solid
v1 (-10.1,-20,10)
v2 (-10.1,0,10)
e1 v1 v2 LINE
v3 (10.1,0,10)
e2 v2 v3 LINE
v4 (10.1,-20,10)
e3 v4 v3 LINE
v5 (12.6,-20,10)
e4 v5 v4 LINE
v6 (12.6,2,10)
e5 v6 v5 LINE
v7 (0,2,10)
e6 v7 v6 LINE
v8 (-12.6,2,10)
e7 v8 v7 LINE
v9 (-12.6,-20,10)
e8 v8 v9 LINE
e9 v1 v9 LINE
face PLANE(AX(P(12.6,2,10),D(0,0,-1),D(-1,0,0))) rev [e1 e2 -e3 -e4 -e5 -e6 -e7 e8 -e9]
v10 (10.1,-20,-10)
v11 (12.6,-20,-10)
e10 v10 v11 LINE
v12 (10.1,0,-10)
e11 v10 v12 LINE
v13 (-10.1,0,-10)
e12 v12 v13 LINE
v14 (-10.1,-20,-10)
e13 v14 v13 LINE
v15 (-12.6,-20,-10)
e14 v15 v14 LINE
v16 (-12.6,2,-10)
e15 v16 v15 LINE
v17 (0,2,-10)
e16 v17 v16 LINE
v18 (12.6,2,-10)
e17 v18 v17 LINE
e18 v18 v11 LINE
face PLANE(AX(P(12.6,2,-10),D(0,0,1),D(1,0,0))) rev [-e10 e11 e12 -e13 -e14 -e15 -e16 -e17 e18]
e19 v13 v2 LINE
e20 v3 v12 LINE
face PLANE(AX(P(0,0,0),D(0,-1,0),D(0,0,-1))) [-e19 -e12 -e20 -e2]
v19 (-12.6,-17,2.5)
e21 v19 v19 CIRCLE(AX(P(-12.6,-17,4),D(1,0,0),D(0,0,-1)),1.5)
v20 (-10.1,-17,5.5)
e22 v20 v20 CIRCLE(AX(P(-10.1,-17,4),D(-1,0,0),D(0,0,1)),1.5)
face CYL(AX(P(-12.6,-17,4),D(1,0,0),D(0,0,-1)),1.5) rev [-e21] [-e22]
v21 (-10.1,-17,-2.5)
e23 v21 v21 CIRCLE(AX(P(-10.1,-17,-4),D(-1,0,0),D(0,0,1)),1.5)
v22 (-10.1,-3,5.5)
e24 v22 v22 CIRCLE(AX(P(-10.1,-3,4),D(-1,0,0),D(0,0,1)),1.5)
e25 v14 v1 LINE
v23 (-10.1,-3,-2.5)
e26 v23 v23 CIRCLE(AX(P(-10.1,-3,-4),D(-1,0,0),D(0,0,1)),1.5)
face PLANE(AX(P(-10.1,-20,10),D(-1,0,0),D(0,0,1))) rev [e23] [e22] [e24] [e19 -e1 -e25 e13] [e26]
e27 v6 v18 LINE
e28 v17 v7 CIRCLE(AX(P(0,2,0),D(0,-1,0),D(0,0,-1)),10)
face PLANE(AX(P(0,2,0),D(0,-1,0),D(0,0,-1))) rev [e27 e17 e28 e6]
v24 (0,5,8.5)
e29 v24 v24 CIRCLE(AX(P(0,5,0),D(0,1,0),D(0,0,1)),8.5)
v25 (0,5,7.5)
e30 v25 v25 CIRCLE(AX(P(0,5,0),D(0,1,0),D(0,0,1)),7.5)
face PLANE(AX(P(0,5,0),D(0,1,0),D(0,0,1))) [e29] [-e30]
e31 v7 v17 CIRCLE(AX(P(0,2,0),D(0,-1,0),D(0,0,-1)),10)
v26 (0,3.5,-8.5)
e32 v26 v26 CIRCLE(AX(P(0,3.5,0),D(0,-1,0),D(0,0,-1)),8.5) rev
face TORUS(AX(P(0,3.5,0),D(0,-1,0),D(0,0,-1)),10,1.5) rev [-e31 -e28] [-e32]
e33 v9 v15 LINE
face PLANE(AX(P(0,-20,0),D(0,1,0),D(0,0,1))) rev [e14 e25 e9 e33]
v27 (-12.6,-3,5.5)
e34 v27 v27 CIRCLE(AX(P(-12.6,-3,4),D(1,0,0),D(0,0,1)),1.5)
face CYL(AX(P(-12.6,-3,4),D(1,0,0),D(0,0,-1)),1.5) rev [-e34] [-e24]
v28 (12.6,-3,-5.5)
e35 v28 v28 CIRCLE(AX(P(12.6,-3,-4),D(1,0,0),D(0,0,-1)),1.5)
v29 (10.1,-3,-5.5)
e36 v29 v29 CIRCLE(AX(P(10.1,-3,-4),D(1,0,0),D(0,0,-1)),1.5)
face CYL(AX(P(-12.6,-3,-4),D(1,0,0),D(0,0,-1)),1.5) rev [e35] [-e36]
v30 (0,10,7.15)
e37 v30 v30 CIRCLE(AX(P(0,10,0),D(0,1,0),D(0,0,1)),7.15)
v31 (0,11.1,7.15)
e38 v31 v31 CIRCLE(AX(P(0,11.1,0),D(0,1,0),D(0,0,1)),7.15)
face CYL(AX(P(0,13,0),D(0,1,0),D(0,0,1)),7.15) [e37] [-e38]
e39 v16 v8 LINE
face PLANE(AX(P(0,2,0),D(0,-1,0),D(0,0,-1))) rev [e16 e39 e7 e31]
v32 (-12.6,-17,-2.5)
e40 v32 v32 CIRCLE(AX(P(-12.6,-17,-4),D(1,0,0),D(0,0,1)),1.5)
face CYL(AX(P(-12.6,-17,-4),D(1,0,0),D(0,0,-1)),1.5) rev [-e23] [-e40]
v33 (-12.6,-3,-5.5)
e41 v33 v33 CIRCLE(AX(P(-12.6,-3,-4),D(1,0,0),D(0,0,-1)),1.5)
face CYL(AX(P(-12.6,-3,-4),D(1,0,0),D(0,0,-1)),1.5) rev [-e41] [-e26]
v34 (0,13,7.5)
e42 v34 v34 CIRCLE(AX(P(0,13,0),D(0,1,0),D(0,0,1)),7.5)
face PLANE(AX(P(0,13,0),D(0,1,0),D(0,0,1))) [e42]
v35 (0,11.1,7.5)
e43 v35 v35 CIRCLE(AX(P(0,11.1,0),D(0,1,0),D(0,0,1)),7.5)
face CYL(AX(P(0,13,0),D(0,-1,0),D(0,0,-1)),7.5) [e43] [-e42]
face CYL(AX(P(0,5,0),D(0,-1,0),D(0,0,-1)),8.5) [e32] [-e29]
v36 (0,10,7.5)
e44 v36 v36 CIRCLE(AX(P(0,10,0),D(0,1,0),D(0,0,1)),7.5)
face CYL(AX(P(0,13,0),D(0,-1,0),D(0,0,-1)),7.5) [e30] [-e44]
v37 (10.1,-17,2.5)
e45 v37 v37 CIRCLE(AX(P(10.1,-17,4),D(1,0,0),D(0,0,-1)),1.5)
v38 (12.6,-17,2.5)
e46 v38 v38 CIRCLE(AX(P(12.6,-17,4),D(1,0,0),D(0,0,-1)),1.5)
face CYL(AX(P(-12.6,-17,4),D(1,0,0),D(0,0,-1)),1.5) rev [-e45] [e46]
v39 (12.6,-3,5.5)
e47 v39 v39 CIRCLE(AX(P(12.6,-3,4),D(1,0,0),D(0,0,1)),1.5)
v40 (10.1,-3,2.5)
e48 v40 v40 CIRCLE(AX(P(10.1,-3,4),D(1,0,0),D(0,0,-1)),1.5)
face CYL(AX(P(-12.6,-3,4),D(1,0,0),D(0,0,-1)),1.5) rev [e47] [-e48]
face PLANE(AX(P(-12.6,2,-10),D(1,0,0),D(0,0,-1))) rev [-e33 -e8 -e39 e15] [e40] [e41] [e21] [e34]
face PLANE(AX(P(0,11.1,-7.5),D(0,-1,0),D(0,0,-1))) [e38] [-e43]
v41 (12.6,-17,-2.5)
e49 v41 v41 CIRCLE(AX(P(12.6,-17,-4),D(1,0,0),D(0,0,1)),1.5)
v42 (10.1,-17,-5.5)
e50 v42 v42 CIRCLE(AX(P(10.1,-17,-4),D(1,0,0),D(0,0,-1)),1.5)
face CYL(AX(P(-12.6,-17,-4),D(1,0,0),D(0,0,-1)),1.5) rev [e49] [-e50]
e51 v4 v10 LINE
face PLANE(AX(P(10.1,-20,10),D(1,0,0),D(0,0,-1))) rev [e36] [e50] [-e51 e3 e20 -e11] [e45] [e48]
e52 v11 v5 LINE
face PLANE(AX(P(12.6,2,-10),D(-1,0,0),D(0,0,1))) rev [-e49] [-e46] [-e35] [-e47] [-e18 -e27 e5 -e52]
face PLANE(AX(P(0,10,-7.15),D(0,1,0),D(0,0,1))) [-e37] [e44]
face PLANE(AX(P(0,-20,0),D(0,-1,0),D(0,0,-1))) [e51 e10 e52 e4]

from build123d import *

# Parameters (mm, degrees)
SKETCH_1_W          = 25.2
SKETCH_1_H          = 20
EXTRUDE_1_DEPTH     = 2
SKETCH_2_W          = 2.5
SKETCH_2_H          = 20
EXTRUDE_2_DEPTH     = 20
SKETCH_3_R          = 1.5
CUT_EXTRUDE_1_DEPTH = 34.690354703
SKETCH_4_R          = 8.5
EXTRUDE_3_DEPTH     = 3
SKETCH_5_R          = 7.5
EXTRUDE_4_DEPTH     = 8
SKETCH_6_R          = 7
EXTRUDE_5_DEPTH     = 18
SKETCH_10_R         = 9.319748931
SKETCH_10_W         = 12
SKETCH_10_H         = 12
CUT_EXTRUDE_4_DEPTH = 15
FILLET_2_R          = 1.5
SKETCH_12_R         = 7.5
CUT_EXTRUDE_5_DEPTH = 26
SKETCH_13_W         = 0.35
SKETCH_13_H         = 1.1


with BuildPart() as part:
    # 草图1 → 凸台-拉伸1 (new body)
    with BuildSketch(Plane(origin=(0, 0, 0), x_dir=(1, 0, 0), z_dir=(0, 1, 0))):
        Rectangle(SKETCH_1_W, SKETCH_1_H)
    extrude(amount=EXTRUDE_1_DEPTH)

    # 草图2 → 凸台-拉伸2 (add)
    with BuildSketch(Plane.XZ):
        with Locations((-11.35, 0)):
            Rectangle(SKETCH_2_W, SKETCH_2_H)
        with Locations((11.35, 0)):
            Rectangle(SKETCH_2_W, SKETCH_2_H)
    extrude(amount=EXTRUDE_2_DEPTH)

    # 草图3 → 切除-拉伸1 (cut, through all)
    with BuildSketch(Plane(origin=(12.6, 0, 0), x_dir=(0, 0, -1), z_dir=(1, 0, 0))):
        with Locations((-4, -17)):
            Circle(SKETCH_3_R)
        with Locations((4, -17)):
            Circle(SKETCH_3_R)
        with Locations((4, -3)):
            Circle(SKETCH_3_R)
        with Locations((-4, -3)):
            Circle(SKETCH_3_R)
    extrude(amount=-CUT_EXTRUDE_1_DEPTH, mode=Mode.SUBTRACT)

    # 草图4 → 凸台-拉伸3 (add)
    with BuildSketch(Plane(origin=(0, 2, 0), x_dir=(1, 0, 0), z_dir=(0, 1, 0))):
        with Locations(Location((0, 0, 0), (0, 0, 270))):
            Circle(SKETCH_4_R)
    extrude(amount=EXTRUDE_3_DEPTH)

    # 草图5 → 凸台-拉伸4 (add)
    with BuildSketch(Plane(origin=(0, 5, 0), x_dir=(1, 0, 0), z_dir=(0, 1, 0))):
        with Locations(Location((0, 0, 0), (0, 0, 270))):
            Circle(SKETCH_5_R)
    extrude(amount=EXTRUDE_4_DEPTH)

    # 草图6 → 凸台-拉伸5 (add)
    with BuildSketch(Plane(origin=(0, 13, 0), x_dir=(1, 0, 0), z_dir=(0, 1, 0))):
        with Locations(Location((0, 0, 0), (0, 0, 270))):
            Circle(SKETCH_6_R)
    extrude(amount=EXTRUDE_5_DEPTH)

    # 草图10 → 切除-拉伸4 (cut)
    with BuildSketch(Plane(origin=(0, 31, 0), x_dir=(1, 0, 0), z_dir=(0, 1, 0))):
        Circle(SKETCH_10_R)
        Rectangle(SKETCH_10_W, SKETCH_10_H, mode=Mode.SUBTRACT)
    extrude(amount=-CUT_EXTRUDE_4_DEPTH, mode=Mode.SUBTRACT)

    # 圆角2
    fillet_2_edges = [part.edges().sort_by_distance(p)[0] for p in [
        (0, 2, -8.5),
    ]]
    fillet(fillet_2_edges, radius=FILLET_2_R - 0.0001)  # a hair under: the kernel refuses the full size

    # 草图12 → 切除-拉伸5 (cut)
    with BuildSketch(Plane(origin=(0, 13, 0), x_dir=(1, 0, 0), z_dir=(0, 1, 0))):
        with Locations(Location((0, 0, 0), (0, 0, 270))):
            Circle(SKETCH_12_R)
    extrude(amount=CUT_EXTRUDE_5_DEPTH, mode=Mode.SUBTRACT)

    # 草图13 → 切除-旋转1 (revolve, cut)
    with BuildSketch(Plane(origin=(0, 0, 0), x_dir=(0, 0, -1), z_dir=(1, 0, 0)), mode=Mode.PRIVATE) as cut_revolve_1_sk:
        with Locations((7.325, 10.55)):
            Rectangle(SKETCH_13_W, SKETCH_13_H)
    revolve(cut_revolve_1_sk.sketch.rotate(Axis((0, 13, 0), (0, -1, 0)), 180), axis=Axis((0, 13, 0), (0, -1, 0)), mode=Mode.SUBTRACT)


solid = part.part
